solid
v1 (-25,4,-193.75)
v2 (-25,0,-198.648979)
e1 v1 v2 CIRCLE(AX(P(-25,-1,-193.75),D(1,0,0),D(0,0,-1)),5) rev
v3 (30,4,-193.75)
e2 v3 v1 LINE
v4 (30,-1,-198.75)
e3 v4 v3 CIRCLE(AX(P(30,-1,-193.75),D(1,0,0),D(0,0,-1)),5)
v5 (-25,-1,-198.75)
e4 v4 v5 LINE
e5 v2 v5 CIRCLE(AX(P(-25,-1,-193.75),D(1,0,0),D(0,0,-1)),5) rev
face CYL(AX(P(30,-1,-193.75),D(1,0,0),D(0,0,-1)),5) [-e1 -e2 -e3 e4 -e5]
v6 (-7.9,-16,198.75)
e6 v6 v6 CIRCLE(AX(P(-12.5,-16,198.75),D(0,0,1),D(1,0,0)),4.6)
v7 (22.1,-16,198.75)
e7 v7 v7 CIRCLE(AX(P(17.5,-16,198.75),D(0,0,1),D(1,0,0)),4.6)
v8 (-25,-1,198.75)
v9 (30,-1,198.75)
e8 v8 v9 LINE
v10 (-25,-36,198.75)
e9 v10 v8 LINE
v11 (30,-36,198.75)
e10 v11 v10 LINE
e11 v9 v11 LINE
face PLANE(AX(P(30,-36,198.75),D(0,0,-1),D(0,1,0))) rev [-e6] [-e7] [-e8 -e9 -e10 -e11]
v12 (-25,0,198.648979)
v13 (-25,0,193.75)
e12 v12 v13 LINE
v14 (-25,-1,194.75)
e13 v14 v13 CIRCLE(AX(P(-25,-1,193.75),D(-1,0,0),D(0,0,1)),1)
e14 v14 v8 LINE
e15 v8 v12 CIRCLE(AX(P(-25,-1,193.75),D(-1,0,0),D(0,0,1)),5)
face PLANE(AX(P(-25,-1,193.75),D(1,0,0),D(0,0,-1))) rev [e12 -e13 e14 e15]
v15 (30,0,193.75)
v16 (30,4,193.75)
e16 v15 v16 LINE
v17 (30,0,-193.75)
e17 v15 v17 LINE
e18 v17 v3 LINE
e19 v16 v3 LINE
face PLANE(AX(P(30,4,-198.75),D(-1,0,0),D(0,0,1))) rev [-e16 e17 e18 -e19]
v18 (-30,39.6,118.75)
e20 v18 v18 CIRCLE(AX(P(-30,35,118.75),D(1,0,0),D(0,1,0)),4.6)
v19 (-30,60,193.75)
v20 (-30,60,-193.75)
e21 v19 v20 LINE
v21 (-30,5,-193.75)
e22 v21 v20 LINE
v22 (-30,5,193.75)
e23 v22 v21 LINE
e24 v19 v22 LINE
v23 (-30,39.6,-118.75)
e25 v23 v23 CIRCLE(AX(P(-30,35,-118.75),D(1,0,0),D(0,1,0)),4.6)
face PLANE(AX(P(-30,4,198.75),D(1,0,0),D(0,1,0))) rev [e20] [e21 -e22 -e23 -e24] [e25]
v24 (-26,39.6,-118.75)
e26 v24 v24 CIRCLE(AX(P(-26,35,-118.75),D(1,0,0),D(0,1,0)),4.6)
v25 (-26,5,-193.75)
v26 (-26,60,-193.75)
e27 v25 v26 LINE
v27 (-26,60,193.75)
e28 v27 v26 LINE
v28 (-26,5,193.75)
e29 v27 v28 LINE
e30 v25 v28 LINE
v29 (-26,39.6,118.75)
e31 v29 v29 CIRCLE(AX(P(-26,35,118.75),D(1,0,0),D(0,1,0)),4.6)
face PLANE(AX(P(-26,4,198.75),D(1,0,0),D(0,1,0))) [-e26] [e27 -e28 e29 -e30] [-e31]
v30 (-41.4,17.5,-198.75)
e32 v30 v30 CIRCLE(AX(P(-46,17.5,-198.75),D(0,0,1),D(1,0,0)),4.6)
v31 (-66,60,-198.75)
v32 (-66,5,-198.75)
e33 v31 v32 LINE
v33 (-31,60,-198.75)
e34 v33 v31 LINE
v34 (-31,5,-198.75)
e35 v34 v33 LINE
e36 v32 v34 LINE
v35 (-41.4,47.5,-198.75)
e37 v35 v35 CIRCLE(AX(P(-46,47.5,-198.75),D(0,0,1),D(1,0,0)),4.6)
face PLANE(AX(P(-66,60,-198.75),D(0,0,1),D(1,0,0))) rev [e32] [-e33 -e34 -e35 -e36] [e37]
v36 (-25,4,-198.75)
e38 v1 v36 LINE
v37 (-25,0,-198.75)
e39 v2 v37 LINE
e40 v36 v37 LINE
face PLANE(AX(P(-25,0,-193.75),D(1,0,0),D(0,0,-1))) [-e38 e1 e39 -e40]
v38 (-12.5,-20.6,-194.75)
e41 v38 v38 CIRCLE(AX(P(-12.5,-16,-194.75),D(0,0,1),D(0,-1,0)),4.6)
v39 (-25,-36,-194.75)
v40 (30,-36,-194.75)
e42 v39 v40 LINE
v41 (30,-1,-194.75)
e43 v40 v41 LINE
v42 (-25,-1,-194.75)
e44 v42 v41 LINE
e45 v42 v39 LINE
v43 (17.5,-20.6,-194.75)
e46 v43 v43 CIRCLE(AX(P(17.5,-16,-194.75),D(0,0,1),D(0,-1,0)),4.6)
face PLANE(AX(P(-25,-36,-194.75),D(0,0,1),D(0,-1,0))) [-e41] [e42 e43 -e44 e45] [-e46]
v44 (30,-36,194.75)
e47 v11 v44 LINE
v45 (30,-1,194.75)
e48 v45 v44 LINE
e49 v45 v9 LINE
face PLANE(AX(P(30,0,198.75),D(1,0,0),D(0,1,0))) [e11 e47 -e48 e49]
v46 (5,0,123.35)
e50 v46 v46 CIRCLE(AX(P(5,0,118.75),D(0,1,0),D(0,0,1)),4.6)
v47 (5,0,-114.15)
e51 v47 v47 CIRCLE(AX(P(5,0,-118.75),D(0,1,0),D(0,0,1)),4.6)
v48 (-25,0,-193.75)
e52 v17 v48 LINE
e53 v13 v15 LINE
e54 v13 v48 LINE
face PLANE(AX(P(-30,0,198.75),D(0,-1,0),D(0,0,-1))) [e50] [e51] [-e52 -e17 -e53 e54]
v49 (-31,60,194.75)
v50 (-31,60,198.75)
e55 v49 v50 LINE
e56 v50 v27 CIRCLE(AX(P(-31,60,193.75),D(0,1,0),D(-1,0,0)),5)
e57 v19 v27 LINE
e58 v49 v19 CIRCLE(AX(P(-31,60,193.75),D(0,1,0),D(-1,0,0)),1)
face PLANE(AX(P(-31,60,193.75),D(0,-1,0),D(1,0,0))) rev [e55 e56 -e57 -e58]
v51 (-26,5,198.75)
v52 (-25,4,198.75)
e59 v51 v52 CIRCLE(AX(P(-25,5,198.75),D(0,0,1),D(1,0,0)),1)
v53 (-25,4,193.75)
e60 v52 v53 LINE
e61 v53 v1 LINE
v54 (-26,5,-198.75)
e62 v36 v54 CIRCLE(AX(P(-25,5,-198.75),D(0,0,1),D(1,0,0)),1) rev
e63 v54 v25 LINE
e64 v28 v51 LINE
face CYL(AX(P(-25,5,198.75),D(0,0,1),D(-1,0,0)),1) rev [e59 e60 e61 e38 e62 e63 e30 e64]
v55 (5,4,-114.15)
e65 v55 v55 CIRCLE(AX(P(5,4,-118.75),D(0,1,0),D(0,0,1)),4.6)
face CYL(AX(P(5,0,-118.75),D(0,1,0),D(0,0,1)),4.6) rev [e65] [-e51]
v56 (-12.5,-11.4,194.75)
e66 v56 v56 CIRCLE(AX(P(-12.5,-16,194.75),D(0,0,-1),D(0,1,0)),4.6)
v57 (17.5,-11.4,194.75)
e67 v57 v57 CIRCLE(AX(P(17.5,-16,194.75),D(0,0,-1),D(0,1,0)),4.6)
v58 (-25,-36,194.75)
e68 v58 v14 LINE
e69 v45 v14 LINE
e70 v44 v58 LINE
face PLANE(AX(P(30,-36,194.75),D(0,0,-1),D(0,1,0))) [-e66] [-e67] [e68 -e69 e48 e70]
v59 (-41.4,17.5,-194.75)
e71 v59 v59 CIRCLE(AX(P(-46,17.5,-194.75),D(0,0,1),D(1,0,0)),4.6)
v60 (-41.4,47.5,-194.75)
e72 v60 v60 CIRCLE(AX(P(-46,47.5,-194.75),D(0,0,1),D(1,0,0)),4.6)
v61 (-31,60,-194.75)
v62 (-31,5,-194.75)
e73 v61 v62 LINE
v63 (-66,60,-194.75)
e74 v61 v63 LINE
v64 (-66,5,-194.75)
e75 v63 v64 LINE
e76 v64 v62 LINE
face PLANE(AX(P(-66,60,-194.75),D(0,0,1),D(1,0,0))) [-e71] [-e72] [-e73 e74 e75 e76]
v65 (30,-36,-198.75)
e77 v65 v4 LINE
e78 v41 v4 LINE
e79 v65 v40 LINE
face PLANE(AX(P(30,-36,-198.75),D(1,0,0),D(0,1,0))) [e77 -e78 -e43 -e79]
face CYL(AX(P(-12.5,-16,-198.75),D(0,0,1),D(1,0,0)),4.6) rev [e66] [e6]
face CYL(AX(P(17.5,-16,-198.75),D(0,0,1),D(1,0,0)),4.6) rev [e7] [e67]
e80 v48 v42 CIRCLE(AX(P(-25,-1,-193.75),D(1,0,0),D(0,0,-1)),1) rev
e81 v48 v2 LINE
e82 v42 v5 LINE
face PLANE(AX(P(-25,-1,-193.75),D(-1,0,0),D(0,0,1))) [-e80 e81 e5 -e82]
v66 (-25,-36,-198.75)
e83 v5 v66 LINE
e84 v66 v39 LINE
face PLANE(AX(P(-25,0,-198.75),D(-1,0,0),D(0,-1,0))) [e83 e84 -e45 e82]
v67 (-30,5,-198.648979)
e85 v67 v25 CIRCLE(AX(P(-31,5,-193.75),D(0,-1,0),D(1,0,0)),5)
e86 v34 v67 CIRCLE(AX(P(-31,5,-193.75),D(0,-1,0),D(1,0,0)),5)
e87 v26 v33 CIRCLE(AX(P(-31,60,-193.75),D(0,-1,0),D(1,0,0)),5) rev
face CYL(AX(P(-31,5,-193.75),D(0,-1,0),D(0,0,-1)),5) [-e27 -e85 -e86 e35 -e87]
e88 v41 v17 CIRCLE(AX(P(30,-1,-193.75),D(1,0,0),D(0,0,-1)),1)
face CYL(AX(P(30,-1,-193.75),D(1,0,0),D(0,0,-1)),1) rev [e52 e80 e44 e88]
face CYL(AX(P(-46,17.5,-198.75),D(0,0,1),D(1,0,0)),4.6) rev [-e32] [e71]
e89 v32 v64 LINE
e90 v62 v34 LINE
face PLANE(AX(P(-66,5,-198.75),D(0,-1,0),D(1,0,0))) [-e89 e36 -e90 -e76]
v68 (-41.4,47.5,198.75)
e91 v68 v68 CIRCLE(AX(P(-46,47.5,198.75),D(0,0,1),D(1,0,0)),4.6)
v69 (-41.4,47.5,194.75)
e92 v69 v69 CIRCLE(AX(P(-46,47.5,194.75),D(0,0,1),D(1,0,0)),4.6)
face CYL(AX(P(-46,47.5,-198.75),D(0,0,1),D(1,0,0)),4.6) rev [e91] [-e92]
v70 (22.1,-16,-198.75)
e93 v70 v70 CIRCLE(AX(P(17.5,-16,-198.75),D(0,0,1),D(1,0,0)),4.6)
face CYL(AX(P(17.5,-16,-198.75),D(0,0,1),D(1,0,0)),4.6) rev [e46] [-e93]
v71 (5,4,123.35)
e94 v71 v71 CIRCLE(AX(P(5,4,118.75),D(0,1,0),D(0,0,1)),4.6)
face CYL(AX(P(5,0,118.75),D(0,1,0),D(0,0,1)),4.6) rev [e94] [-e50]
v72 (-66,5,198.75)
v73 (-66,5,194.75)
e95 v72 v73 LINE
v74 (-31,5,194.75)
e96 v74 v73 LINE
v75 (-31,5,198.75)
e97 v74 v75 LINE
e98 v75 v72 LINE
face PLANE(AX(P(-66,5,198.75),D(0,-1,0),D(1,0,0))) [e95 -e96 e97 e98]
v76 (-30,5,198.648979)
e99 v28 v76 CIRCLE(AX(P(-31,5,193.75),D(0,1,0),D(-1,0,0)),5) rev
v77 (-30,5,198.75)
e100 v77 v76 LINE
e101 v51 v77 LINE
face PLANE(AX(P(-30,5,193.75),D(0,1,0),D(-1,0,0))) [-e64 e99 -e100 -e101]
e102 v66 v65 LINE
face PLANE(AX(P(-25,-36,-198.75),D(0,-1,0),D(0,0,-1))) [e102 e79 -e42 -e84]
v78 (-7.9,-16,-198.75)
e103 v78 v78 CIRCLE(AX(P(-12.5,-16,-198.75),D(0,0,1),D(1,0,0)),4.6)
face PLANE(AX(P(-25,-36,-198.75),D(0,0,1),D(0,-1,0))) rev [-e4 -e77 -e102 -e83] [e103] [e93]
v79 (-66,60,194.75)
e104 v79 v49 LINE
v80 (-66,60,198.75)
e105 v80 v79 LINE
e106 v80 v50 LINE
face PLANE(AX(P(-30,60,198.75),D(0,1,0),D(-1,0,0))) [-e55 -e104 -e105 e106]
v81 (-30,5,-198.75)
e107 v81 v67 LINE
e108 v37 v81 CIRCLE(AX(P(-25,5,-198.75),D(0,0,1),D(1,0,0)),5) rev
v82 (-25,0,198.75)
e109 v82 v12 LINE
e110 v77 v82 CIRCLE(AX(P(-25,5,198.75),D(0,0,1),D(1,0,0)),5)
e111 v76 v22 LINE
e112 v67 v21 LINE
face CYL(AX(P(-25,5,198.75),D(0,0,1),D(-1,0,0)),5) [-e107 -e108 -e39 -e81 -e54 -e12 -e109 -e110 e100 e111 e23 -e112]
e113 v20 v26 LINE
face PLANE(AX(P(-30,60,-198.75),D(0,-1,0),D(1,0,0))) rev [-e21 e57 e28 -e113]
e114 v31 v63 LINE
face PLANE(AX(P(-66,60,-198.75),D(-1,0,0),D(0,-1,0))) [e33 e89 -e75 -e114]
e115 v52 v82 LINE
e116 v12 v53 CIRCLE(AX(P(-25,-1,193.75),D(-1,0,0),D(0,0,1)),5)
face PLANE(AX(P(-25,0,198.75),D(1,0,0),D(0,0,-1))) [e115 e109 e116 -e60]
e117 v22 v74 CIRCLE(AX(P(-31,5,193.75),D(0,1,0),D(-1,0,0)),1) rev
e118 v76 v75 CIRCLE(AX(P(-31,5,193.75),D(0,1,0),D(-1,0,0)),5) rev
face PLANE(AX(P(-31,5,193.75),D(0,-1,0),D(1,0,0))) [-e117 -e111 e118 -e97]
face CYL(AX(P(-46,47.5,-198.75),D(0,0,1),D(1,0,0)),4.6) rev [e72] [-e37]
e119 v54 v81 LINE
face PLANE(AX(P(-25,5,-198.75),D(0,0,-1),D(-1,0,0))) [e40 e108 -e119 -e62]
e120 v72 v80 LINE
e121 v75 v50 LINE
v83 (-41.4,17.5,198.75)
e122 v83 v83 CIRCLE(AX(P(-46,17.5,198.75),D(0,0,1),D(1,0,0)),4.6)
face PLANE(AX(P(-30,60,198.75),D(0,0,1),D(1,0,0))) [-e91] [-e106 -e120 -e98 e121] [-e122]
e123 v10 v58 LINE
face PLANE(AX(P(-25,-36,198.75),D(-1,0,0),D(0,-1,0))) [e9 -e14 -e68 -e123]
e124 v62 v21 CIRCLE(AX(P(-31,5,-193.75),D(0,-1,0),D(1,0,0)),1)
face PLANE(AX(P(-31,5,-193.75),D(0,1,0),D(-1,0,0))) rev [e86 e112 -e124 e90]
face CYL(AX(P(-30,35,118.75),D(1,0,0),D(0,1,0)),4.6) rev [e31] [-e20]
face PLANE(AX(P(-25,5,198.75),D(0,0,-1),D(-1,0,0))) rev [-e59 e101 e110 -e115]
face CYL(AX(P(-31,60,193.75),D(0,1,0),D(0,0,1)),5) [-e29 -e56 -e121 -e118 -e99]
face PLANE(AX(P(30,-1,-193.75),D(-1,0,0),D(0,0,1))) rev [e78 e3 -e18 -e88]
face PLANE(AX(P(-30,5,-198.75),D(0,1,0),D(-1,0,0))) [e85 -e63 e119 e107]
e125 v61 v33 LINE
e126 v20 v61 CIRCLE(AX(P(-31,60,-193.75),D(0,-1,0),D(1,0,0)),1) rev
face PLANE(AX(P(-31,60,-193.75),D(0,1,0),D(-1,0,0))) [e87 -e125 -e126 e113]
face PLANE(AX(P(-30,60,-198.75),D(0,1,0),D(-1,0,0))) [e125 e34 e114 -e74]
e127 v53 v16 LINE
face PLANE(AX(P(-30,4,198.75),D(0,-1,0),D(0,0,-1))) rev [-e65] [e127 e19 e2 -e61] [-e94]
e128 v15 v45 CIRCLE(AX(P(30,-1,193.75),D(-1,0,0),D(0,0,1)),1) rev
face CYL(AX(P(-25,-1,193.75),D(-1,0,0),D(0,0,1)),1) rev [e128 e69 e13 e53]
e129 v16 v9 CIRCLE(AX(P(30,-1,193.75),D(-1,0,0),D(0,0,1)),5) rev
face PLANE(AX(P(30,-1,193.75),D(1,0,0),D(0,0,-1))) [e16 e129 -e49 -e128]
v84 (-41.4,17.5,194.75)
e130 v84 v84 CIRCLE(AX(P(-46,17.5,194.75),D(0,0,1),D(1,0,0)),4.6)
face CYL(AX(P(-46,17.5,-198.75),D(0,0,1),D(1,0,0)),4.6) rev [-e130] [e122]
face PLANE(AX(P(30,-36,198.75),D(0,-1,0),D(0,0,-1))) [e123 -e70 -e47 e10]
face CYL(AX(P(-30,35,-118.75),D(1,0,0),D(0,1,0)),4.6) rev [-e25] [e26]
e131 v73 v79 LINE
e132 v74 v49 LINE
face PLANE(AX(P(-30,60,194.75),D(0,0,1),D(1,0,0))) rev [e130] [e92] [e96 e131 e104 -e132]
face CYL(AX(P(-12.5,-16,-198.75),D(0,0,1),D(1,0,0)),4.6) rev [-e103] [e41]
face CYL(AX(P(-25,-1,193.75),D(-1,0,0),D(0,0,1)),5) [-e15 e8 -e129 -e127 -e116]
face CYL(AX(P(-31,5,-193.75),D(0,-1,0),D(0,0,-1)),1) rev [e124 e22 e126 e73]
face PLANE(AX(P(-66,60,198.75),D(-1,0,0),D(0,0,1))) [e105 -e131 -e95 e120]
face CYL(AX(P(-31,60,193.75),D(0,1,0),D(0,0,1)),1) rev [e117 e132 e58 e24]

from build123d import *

# Parameters (mm, degrees)
SKETCH1_W                      = 60
SKETCH1_H                      = 397.5
BASE_FLANGE1_DEPTH             = 4
EDGE_FLANGE1_STRIP_W           = 18
EDGE_FLANGE1_STRIP_H           = 4
EDGE_FLANGE1_STRIP_CUT_DEPTH   = 397.5
EDGE_FLANGE1_DEPTH             = 397.5
EDGE_FLANGE2_STRIP_W           = 18
EDGE_FLANGE2_STRIP_H           = 4
EDGE_FLANGE2_STRIP_CUT_DEPTH   = 55
EDGE_FLANGE2_STRIP_2_W         = 18
EDGE_FLANGE2_STRIP_2_H         = 4
EDGE_FLANGE2_STRIP_CUT_2_DEPTH = 55
EDGE_FLANGE2_STRIP_3_W         = 18
EDGE_FLANGE2_STRIP_3_H         = 4
EDGE_FLANGE2_STRIP_CUT_3_DEPTH = 55
EDGE_FLANGE2_STRIP_4_W         = 18
EDGE_FLANGE2_STRIP_4_H         = 4
EDGE_FLANGE2_STRIP_CUT_4_DEPTH = 55
EDGE_FLANGE2_DEPTH             = 55
EDGE_FLANGE2_BEND_DEPTH        = 55
EDGE_FLANGE2_BEND_2_DEPTH      = 55
EDGE_FLANGE2_BEND_3_DEPTH      = 55
SKETCH18_R                     = 4.6
EXTRUDE1_DEPTH                 = 408.38464625
SKETCH19_R                     = 4.6
EXTRUDE2_DEPTH                 = 4
SKETCH20_R                     = 4.6
EXTRUDE3_DEPTH                 = 4


# Sheet-metal steps are written as plain solids
with BuildPart() as part:
    # Sketch1 → Base-Flange1 (new body)
    with BuildSketch(Plane(origin=(0, 0, 0), x_dir=(1, 0, 0), z_dir=(0, 1, 0))):
        Rectangle(SKETCH1_W, SKETCH1_H)
    extrude(amount=BASE_FLANGE1_DEPTH)

    # Edge-Flange1 strip (across the edge) → Edge-Flange1 strip cut (cut)
    with BuildSketch(Plane(origin=(-30, 4, -198.75), x_dir=(1, 0, 0), z_dir=(0, 0, 1))):
        with Locations((-4, -2)):
            Rectangle(EDGE_FLANGE1_STRIP_W, EDGE_FLANGE1_STRIP_H)
    extrude(amount=EDGE_FLANGE1_STRIP_CUT_DEPTH, mode=Mode.SUBTRACT)

    # Edge-Flange1 section (across the edge) → Edge-Flange1 (add)
    with BuildSketch(Plane(origin=(-30, 4, -198.75), x_dir=(1, 0, 0), z_dir=(0, 0, 1))):
        with BuildLine():
            Line((0, 1), (0, 56))
            Line((0, 56), (4, 56))
            Line((4, 56), (4, 1))
            ThreePointArc((4, 1), (4.292893219, 0.292893219), (5, 0))
            Line((5, 0), (5, -4))
            ThreePointArc((5, -4), (1.464466094, -2.535533906), (0, 1))
        make_face()
    extrude(amount=EDGE_FLANGE1_DEPTH)

    # Edge-Flange2 strip (across the edge) → Edge-Flange2 strip cut (cut)
    with BuildSketch(Plane(origin=(-30, 5, 198.75), x_dir=(0, 0, -1), z_dir=(0, 1, 0))):
        with Locations((-4, -2)):
            Rectangle(EDGE_FLANGE2_STRIP_W, EDGE_FLANGE2_STRIP_H)
    extrude(amount=EDGE_FLANGE2_STRIP_CUT_DEPTH, mode=Mode.SUBTRACT)

    # Edge-Flange2 strip 2 (across the edge) → Edge-Flange2 strip cut 2 (cut)
    with BuildSketch(Plane(origin=(30, 0, 198.75), x_dir=(0, 0, -1), z_dir=(-1, 0, 0))):
        with Locations((-4, -2)):
            Rectangle(EDGE_FLANGE2_STRIP_2_W, EDGE_FLANGE2_STRIP_2_H)
    extrude(amount=EDGE_FLANGE2_STRIP_CUT_2_DEPTH, mode=Mode.SUBTRACT)

    # Edge-Flange2 strip 3 (across the edge) → Edge-Flange2 strip cut 3 (cut)
    with BuildSketch(Plane(origin=(-30, 60, -198.75), x_dir=(0, 0, 1), z_dir=(0, -1, 0))):
        with Locations((-4, -2)):
            Rectangle(EDGE_FLANGE2_STRIP_3_W, EDGE_FLANGE2_STRIP_3_H)
    extrude(amount=EDGE_FLANGE2_STRIP_CUT_3_DEPTH, mode=Mode.SUBTRACT)

    # Edge-Flange2 strip 4 (across the edge) → Edge-Flange2 strip cut 4 (cut)
    with BuildSketch(Plane(origin=(-25, 0, -198.75), x_dir=(0, 0, 1), z_dir=(1, 0, 0))):
        with Locations((-4, -2)):
            Rectangle(EDGE_FLANGE2_STRIP_4_W, EDGE_FLANGE2_STRIP_4_H)
    extrude(amount=EDGE_FLANGE2_STRIP_CUT_4_DEPTH, mode=Mode.SUBTRACT)

    # Edge-Flange2 section (across the edge) → Edge-Flange2 (add)
    with BuildSketch(Plane(origin=(-30, 5, 198.75), x_dir=(0, 0, -1), z_dir=(0, 1, 0))):
        with BuildLine():
            Line((0, 1), (0, 36))
            Line((0, 36), (4, 36))
            Line((4, 36), (4, 1))
            ThreePointArc((4, 1), (4.292893219, 0.292893219), (5, 0))
            Line((5, 0), (5, -4))
            ThreePointArc((5, -4), (1.464466094, -2.535533906), (0, 1))
        make_face()
    extrude(amount=EDGE_FLANGE2_DEPTH)

    # Edge-Flange2 section 2 (across the edge) → Edge-Flange2 bend (add)
    with BuildSketch(Plane(origin=(30, 0, 198.75), x_dir=(0, 0, -1), z_dir=(-1, 0, 0))):
        with BuildLine():
            Line((0, 1), (0, 36))
            Line((0, 36), (4, 36))
            Line((4, 36), (4, 1))
            ThreePointArc((4, 1), (4.292893219, 0.292893219), (5, 0))
            Line((5, 0), (5, -4))
            ThreePointArc((5, -4), (1.464466094, -2.535533906), (0, 1))
        make_face()
    extrude(amount=EDGE_FLANGE2_BEND_DEPTH)

    # Edge-Flange2 section 3 (across the edge) → Edge-Flange2 bend 2 (add)
    with BuildSketch(Plane(origin=(-30, 60, -198.75), x_dir=(0, 0, 1), z_dir=(0, -1, 0))):
        with BuildLine():
            Line((0, 1), (0, 36))
            Line((0, 36), (4, 36))
            Line((4, 36), (4, 1))
            ThreePointArc((4, 1), (4.292893219, 0.292893219), (5, 0))
            Line((5, 0), (5, -4))
            ThreePointArc((5, -4), (1.464466094, -2.535533906), (0, 1))
        make_face()
    extrude(amount=EDGE_FLANGE2_BEND_2_DEPTH)

    # Edge-Flange2 section 4 (across the edge) → Edge-Flange2 bend 3 (add)
    with BuildSketch(Plane(origin=(-25, 0, -198.75), x_dir=(0, 0, 1), z_dir=(1, 0, 0))):
        with BuildLine():
            Line((0, 1), (0, 36))
            Line((0, 36), (4, 36))
            Line((4, 36), (4, 1))
            ThreePointArc((4, 1), (4.292893219, 0.292893219), (5, 0))
            Line((5, 0), (5, -4))
            ThreePointArc((5, -4), (1.464466094, -2.535533906), (0, 1))
        make_face()
    extrude(amount=EDGE_FLANGE2_BEND_3_DEPTH)

    # Sketch18 → Extrude1 (cut, through all)
    with BuildSketch(Plane.XY.offset(198.75)):
        with Locations((-46, 47.5)):
            Circle(SKETCH18_R)
        with Locations((-46, 17.5)):
            Circle(SKETCH18_R)
        with Locations((-12.5, -16)):
            Circle(SKETCH18_R)
        with Locations((17.5, -16)):
            Circle(SKETCH18_R)
    extrude(amount=-EXTRUDE1_DEPTH, mode=Mode.SUBTRACT)

    # Sketch19 → Extrude2 (cut)
    with BuildSketch(Plane(origin=(-26, 0, 0), x_dir=(0, 0, -1), z_dir=(1, 0, 0))):
        with Locations(Location((-118.75, 35, 0), (0, 0, 90))):
            Circle(SKETCH19_R)
        with Locations(Location((118.75, 35, 0), (0, 0, 90))):
            Circle(SKETCH19_R)
    extrude(amount=-EXTRUDE2_DEPTH, mode=Mode.SUBTRACT)

    # Sketch20 → Extrude3 (cut)
    with BuildSketch(Plane(origin=(0, 4, 0), x_dir=(1, 0, 0), z_dir=(0, 1, 0))):
        with Locations(Location((5, 118.75, 0), (0, 0, 270))):
            Circle(SKETCH20_R)
        with Locations(Location((5, -118.75, 0), (0, 0, 270))):
            Circle(SKETCH20_R)
    extrude(amount=-EXTRUDE3_DEPTH, mode=Mode.SUBTRACT)


solid = part.part
